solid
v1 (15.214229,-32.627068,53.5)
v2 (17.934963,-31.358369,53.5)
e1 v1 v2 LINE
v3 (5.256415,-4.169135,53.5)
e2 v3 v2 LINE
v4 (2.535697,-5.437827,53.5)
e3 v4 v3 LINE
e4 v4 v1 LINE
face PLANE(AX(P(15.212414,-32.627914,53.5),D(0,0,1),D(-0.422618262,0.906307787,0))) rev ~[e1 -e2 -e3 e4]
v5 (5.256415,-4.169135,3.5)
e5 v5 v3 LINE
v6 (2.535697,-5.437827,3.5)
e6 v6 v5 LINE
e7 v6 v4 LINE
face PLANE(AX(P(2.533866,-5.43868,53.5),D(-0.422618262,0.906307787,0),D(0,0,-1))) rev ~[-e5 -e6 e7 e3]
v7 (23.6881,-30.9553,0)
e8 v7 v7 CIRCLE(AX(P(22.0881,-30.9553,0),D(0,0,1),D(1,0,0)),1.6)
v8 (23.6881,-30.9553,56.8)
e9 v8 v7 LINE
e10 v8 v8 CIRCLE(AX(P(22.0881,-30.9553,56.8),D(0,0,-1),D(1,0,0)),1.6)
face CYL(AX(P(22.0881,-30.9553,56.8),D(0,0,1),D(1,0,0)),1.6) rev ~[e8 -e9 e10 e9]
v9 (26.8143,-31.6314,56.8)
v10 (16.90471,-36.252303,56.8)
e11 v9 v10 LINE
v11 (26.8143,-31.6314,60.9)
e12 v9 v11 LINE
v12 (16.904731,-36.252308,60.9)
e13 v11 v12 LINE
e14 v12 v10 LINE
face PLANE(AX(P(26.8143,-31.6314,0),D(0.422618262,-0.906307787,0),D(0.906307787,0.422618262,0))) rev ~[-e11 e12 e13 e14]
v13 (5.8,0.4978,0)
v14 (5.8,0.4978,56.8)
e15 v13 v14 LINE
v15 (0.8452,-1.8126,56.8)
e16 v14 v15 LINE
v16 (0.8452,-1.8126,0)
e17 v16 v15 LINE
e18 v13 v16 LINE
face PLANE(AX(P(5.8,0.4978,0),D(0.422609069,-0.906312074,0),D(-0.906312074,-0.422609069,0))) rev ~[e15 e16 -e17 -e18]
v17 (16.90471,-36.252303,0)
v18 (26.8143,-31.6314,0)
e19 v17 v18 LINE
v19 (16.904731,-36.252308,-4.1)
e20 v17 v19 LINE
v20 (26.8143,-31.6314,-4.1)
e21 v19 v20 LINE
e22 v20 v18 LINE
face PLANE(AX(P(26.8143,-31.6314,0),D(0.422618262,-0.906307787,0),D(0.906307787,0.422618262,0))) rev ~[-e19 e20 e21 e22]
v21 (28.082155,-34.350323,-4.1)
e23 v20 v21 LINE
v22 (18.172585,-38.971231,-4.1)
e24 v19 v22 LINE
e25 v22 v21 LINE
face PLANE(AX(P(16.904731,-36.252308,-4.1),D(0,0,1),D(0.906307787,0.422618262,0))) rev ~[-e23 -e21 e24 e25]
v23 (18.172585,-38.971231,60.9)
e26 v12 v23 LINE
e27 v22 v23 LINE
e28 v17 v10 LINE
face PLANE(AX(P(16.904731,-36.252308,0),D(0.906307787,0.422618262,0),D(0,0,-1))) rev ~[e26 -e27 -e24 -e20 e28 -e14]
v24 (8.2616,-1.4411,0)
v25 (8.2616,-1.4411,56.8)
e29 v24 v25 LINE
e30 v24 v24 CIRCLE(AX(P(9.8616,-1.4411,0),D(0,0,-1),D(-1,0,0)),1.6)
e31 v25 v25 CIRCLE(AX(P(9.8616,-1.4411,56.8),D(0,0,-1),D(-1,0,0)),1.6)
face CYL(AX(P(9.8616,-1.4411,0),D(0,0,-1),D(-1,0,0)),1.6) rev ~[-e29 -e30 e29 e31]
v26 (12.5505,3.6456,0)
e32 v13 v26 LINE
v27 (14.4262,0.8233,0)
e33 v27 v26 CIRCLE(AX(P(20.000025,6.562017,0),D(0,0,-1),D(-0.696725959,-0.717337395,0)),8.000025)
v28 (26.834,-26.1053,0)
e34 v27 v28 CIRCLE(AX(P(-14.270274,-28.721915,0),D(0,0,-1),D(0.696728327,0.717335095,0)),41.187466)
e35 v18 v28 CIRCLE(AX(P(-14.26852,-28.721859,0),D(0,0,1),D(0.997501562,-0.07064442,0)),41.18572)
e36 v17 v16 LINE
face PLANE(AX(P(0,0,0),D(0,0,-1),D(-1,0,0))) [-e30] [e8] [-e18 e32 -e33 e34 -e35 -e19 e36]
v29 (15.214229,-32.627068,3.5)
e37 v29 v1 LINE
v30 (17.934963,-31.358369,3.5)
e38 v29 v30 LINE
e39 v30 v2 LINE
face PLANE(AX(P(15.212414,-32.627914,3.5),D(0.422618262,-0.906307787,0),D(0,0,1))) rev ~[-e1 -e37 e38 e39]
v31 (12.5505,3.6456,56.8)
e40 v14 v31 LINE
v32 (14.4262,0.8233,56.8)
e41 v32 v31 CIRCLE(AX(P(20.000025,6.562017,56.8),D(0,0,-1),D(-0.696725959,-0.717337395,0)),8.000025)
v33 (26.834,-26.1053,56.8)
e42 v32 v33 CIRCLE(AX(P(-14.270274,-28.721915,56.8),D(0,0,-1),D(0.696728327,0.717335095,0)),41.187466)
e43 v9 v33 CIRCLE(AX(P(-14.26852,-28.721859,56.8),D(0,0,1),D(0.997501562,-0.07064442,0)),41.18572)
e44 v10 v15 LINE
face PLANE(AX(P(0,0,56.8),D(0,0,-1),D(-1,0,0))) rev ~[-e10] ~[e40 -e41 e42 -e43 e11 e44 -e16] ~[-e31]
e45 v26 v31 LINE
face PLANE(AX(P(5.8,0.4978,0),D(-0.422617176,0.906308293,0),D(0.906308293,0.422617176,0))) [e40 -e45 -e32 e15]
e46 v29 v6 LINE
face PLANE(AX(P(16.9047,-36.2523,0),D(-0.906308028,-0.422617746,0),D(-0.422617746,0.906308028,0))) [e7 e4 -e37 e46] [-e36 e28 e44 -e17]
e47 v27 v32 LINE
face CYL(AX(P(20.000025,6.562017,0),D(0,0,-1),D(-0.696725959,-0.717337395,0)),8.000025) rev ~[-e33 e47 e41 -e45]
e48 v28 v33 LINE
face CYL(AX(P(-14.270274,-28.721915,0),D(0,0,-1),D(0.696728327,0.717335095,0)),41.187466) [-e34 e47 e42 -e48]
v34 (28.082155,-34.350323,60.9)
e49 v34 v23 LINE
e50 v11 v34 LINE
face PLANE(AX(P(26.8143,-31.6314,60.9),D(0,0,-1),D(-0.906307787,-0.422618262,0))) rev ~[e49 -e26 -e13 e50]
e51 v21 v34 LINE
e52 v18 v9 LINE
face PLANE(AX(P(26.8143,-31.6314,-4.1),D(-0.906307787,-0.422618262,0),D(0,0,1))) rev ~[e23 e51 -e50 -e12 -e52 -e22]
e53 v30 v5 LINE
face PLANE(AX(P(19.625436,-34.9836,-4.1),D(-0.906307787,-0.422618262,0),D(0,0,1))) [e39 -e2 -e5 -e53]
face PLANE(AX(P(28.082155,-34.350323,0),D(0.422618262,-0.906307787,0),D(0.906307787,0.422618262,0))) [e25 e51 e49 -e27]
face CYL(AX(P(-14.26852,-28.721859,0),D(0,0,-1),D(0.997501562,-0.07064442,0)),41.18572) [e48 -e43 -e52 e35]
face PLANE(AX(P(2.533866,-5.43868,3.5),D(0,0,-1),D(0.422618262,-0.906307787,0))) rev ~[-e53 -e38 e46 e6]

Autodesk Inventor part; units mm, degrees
ref_plane "YZ Plane" through (0, 0, 0) normal (1, 0, 0) x (0, 1, 0)
ref_plane "XZ Plane" through (0, 0, 0) normal (0, 1, 0) x (-1, 0, 0)
ref_plane "XY Plane" through (0, 0, 0) normal (0, 0, 1) x (1, 0, 0)
sketch "스케치1" plane through (0, 0, 0) normal (0, 0, 1) x (1, 0, 0)
  line L0 (16.9047, -36.2523) -> (26.8143, -31.6314)
  arc A0 (17.3077, -34.3271) -> (17.3407, -34.809) centre (18.2923, -34.5019) ccw
  line L1 (20, -34.809) -> (17.8869, -30.2774)
  line L2 (20, -34.809) -> (25, -34.809) construction
  line L3 (17.8869, -30.2774) -> (26.834, -26.1053)
  arc A1 (26.8143, -31.6314) -> (26.834, -26.1053) centre (-14.2701, -28.7218) ccw
  line L4 (26.834, -26.1053) -> (17.7607, -30.3363)
  arc A2 (16.9047, -36.2523) -> (17.7607, -30.3363) centre (-14.2701, -28.7218) ccw
  line L5 (26.834, -26.1053) -> (16.9047, -36.2523)
  line L6 (17.9253, -30.3598) -> (26.8143, -31.6314)
  circle A3 centre (22.0881, -30.9553) radius 1.6
  point P0 (0, 0)
  point P1 (12.3536, 2.7038)
  point P2 (0.5383, -0.2738)
  dimension "d0" = 5
  dimension "d1" = 115
  dimension "d2" = 90
  dimension "d3" = 3.2
extrude "돌출1" add sketch "스케치1" along normal blind 56.8
sketch "스케치2" plane through (0, 0, 56.8) normal (0, 0, 1) x (1, 0, 0)
  line L0 (16.9047, -36.2523) -> (26.8143, -31.6314)
  arc A0 (17.3077, -34.3271) -> (18.715, -35.4082) centre (18.2923, -34.5019) ccw
  arc A1 (26.2765, -31.8822) -> (26.8523, -31.032) centre (25.8539, -30.9759) ccw
  line L1 (20, -34.809) -> (17.8869, -30.2774)
  line L2 (20, -34.809) -> (25, -34.809) construction
  line L3 (17.8869, -30.2774) -> (26.834, -26.1053)
  arc A2 (26.8143, -31.6314) -> (12, 3) centre (-14.2701, -28.7218) ccw
  line L4 (26.834, -26.1053) -> (17.7607, -30.3363)
  arc A3 (16.9047, -36.2523) -> (0, 0) centre (-14.2701, -28.7218) ccw
  arc A4 (26.2765, -31.8822) -> (26.8523, -31.032) centre (25.8539, -30.9759) ccw
  circle A5 centre (22.0881, -30.9553) radius 1.6
  line L5 (26.834, -26.1053) -> (22.0881, -30.9553)
  line L6 (19.4569, -33.6442) -> (16.9047, -36.2523)
  line L7 (17.7607, -30.3363) -> (20.5042, -30.7287)
  line L8 (23.6719, -31.1819) -> (26.8143, -31.6314)
  point P0 (12.3536, 2.7038)
  point P1 (0.5383, -0.2738)
  dimension "d6" = 5
  dimension "d7" = 115
  dimension "d8" = 90
  dimension "d9" = 3.2
extrude "돌출2" cut sketch "스케치2" against normal up to surface (56.8 mm away) contours A5
sketch "스케치3" plane through (26.8143, -31.6314, 0) normal (0.4226183, -0.9063078, 0) x (0.9063078, 0.4226183, 0)
  line L0 (-10.934, -4.1) -> (0, -4.1)
  line L1 (0, -4.1) -> (0, 60.9)
  line L2 (0, 60.9) -> (-10.934, 60.9)
  line L3 (-10.934, 60.9) -> (-10.934, -4.1)
  line L4 (0, 0) -> (0, 56.8) projected
  line L5 (-10.934, 0) -> (-10.934, 56.8) projected
  dimension "d12" = 65
  dimension "d13" = 4.1
  dimension "d14" = 10.934
  dimension "d15" = 10.934
  dimension "d16" = 10.934
extrude "돌출3" add sketch "스케치3" along normal blind 3
sketch "스케치4" plane through (0, 0, 0) normal (0, 0, -1) x (-1, 0, 0)
  circle A0 centre (-6, 44) radius 4.8
  circle A1 centre (-6, 9) radius 4.8
  circle A2 centre (-9.8616, -1.4411) radius 1.6
  circle A3 centre (-22.0881, -30.9553) radius 1.6
  arc A4 (0, 44) -> (-12, 44) centre (-6, 44) ccw
  line L0 (-12, 6.562) -> (-12, 44)
  arc A5 (-14.4262, 0.8233) -> (-12, 6.562) centre (-20, 6.562) ccw
  arc A6 (-14.4262, 0.8233) -> (-26.8143, -31.6314) centre (14.2701, -28.7218) ccw
  line L1 (-16.9047, -36.2523) -> (-26.8143, -31.6314)
  line L2 (-16.9047, -36.2523) -> (0, 0)
  line L3 (0, 44) -> (0, 0)
  line L4 (-16.9047, -36.2523) -> (-26.8143, -31.6314) projected
  line L5 (-26.8143, -31.6314) -> (-28.0821, -34.3503) projected
  line L6 (-18.1726, -38.9712) -> (-28.0821, -34.3503) projected
  line L7 (-16.9047, -36.2523) -> (-18.1726, -38.9712) projected
  circle A7 centre (-22.0881, -30.9553) radius 1.6 projected
  line L8 (-16.9047, -36.2523) -> (-26.8143, -31.6314) projected
  arc A8 (-17.7607, -30.3363) -> (-16.9047, -36.2523) centre (14.2701, -28.7218) ccw projected
  line L9 (-26.834, -26.1053) -> (-17.7607, -30.3363) projected
  arc A9 (-26.834, -26.1053) -> (-26.8143, -31.6314) centre (14.2701, -28.7218) ccw projected
  line L10 (-16.9047, -36.2523) -> (-26.8143, -31.6314) projected
  line L11 (-21.8595, -33.9419) -> (-5.8, 0.4978) construction
  line L12 (-5.8, 0.4978) -> (-0.8452, -1.8126)
  line L13 (-5.8, 0.4978) -> (-12.5505, 3.6456)
  point P0 (0, 0)
  point P1 (0, 0)
  point P2 (-17.7151, -2.7731)
  dimension "d19" = 38
extrude "돌출4" add sketch "스케치4" against normal up to surface (56.8 mm away) contours L2 A8 L9 A6 A5 L13 L12
sketch "스케치8" plane through (16.9047, -36.2523, -4.1) normal (-0.9063078, -0.4226183, 0) x (0, 0, 1)
  line L0 (4.1, 38) -> (60.9, 38) projected
  line L1 (4.1, 0) -> (4.1, 38) projected
  line L2 (65, 0) -> (60.9, 0) projected
  line L3 (0, 0) -> (0, -3) projected
  line L4 (65, -3) -> (0, -3) projected
  line L5 (65, 0) -> (65, -3) projected
  line L6 (4.1, 0) -> (0, 0) projected
  line L7 (60.9, 0) -> (60.9, 38) projected
  line L8 (4.1, 0) -> (4.1, 34.6494) projected
  line L9 (61.1, 38) -> (4.1, 38)
  line L10 (4.1, 38) -> (4.1, 0)
  line L11 (4.1, 0) -> (61.1, 0)
  line L12 (61.1, 0) -> (61.1, 38)
  line L13 (4.1, 38) -> (61.1, 38) projected
  line L14 (32.6, 38) -> (32.6, 19)
  line L15 (60.9, 0) -> (60.9, 38) projected
  line L16 (60.9, 19.0005) -> (4.1, 19)
  line L17 (57.6, 34) -> (7.6, 34)
  line L18 (7.6, 34) -> (7.6, 4)
  line L19 (7.6, 4) -> (57.6, 4)
  line L20 (57.6, 4) -> (57.6, 34)
  line L21 (57.6, 34) -> (7.6, 4) construction
  line L22 (7.6, 34) -> (57.6, 4) construction
  point P0 (4.1, 40)
  dimension "d37" = 50
  dimension "d38" = 30
extrude "돌출7" cut sketch "스케치8" against normal blind 3 contours L17 L20 L16 L14 | L14 L16 L18 L17 | L16 L20 L19 L18
equation "\"d15\" = d14"
equation "\"d16\" = d14"
properties part number "Grip_Side_Down" material "LCP 플라스틱"
